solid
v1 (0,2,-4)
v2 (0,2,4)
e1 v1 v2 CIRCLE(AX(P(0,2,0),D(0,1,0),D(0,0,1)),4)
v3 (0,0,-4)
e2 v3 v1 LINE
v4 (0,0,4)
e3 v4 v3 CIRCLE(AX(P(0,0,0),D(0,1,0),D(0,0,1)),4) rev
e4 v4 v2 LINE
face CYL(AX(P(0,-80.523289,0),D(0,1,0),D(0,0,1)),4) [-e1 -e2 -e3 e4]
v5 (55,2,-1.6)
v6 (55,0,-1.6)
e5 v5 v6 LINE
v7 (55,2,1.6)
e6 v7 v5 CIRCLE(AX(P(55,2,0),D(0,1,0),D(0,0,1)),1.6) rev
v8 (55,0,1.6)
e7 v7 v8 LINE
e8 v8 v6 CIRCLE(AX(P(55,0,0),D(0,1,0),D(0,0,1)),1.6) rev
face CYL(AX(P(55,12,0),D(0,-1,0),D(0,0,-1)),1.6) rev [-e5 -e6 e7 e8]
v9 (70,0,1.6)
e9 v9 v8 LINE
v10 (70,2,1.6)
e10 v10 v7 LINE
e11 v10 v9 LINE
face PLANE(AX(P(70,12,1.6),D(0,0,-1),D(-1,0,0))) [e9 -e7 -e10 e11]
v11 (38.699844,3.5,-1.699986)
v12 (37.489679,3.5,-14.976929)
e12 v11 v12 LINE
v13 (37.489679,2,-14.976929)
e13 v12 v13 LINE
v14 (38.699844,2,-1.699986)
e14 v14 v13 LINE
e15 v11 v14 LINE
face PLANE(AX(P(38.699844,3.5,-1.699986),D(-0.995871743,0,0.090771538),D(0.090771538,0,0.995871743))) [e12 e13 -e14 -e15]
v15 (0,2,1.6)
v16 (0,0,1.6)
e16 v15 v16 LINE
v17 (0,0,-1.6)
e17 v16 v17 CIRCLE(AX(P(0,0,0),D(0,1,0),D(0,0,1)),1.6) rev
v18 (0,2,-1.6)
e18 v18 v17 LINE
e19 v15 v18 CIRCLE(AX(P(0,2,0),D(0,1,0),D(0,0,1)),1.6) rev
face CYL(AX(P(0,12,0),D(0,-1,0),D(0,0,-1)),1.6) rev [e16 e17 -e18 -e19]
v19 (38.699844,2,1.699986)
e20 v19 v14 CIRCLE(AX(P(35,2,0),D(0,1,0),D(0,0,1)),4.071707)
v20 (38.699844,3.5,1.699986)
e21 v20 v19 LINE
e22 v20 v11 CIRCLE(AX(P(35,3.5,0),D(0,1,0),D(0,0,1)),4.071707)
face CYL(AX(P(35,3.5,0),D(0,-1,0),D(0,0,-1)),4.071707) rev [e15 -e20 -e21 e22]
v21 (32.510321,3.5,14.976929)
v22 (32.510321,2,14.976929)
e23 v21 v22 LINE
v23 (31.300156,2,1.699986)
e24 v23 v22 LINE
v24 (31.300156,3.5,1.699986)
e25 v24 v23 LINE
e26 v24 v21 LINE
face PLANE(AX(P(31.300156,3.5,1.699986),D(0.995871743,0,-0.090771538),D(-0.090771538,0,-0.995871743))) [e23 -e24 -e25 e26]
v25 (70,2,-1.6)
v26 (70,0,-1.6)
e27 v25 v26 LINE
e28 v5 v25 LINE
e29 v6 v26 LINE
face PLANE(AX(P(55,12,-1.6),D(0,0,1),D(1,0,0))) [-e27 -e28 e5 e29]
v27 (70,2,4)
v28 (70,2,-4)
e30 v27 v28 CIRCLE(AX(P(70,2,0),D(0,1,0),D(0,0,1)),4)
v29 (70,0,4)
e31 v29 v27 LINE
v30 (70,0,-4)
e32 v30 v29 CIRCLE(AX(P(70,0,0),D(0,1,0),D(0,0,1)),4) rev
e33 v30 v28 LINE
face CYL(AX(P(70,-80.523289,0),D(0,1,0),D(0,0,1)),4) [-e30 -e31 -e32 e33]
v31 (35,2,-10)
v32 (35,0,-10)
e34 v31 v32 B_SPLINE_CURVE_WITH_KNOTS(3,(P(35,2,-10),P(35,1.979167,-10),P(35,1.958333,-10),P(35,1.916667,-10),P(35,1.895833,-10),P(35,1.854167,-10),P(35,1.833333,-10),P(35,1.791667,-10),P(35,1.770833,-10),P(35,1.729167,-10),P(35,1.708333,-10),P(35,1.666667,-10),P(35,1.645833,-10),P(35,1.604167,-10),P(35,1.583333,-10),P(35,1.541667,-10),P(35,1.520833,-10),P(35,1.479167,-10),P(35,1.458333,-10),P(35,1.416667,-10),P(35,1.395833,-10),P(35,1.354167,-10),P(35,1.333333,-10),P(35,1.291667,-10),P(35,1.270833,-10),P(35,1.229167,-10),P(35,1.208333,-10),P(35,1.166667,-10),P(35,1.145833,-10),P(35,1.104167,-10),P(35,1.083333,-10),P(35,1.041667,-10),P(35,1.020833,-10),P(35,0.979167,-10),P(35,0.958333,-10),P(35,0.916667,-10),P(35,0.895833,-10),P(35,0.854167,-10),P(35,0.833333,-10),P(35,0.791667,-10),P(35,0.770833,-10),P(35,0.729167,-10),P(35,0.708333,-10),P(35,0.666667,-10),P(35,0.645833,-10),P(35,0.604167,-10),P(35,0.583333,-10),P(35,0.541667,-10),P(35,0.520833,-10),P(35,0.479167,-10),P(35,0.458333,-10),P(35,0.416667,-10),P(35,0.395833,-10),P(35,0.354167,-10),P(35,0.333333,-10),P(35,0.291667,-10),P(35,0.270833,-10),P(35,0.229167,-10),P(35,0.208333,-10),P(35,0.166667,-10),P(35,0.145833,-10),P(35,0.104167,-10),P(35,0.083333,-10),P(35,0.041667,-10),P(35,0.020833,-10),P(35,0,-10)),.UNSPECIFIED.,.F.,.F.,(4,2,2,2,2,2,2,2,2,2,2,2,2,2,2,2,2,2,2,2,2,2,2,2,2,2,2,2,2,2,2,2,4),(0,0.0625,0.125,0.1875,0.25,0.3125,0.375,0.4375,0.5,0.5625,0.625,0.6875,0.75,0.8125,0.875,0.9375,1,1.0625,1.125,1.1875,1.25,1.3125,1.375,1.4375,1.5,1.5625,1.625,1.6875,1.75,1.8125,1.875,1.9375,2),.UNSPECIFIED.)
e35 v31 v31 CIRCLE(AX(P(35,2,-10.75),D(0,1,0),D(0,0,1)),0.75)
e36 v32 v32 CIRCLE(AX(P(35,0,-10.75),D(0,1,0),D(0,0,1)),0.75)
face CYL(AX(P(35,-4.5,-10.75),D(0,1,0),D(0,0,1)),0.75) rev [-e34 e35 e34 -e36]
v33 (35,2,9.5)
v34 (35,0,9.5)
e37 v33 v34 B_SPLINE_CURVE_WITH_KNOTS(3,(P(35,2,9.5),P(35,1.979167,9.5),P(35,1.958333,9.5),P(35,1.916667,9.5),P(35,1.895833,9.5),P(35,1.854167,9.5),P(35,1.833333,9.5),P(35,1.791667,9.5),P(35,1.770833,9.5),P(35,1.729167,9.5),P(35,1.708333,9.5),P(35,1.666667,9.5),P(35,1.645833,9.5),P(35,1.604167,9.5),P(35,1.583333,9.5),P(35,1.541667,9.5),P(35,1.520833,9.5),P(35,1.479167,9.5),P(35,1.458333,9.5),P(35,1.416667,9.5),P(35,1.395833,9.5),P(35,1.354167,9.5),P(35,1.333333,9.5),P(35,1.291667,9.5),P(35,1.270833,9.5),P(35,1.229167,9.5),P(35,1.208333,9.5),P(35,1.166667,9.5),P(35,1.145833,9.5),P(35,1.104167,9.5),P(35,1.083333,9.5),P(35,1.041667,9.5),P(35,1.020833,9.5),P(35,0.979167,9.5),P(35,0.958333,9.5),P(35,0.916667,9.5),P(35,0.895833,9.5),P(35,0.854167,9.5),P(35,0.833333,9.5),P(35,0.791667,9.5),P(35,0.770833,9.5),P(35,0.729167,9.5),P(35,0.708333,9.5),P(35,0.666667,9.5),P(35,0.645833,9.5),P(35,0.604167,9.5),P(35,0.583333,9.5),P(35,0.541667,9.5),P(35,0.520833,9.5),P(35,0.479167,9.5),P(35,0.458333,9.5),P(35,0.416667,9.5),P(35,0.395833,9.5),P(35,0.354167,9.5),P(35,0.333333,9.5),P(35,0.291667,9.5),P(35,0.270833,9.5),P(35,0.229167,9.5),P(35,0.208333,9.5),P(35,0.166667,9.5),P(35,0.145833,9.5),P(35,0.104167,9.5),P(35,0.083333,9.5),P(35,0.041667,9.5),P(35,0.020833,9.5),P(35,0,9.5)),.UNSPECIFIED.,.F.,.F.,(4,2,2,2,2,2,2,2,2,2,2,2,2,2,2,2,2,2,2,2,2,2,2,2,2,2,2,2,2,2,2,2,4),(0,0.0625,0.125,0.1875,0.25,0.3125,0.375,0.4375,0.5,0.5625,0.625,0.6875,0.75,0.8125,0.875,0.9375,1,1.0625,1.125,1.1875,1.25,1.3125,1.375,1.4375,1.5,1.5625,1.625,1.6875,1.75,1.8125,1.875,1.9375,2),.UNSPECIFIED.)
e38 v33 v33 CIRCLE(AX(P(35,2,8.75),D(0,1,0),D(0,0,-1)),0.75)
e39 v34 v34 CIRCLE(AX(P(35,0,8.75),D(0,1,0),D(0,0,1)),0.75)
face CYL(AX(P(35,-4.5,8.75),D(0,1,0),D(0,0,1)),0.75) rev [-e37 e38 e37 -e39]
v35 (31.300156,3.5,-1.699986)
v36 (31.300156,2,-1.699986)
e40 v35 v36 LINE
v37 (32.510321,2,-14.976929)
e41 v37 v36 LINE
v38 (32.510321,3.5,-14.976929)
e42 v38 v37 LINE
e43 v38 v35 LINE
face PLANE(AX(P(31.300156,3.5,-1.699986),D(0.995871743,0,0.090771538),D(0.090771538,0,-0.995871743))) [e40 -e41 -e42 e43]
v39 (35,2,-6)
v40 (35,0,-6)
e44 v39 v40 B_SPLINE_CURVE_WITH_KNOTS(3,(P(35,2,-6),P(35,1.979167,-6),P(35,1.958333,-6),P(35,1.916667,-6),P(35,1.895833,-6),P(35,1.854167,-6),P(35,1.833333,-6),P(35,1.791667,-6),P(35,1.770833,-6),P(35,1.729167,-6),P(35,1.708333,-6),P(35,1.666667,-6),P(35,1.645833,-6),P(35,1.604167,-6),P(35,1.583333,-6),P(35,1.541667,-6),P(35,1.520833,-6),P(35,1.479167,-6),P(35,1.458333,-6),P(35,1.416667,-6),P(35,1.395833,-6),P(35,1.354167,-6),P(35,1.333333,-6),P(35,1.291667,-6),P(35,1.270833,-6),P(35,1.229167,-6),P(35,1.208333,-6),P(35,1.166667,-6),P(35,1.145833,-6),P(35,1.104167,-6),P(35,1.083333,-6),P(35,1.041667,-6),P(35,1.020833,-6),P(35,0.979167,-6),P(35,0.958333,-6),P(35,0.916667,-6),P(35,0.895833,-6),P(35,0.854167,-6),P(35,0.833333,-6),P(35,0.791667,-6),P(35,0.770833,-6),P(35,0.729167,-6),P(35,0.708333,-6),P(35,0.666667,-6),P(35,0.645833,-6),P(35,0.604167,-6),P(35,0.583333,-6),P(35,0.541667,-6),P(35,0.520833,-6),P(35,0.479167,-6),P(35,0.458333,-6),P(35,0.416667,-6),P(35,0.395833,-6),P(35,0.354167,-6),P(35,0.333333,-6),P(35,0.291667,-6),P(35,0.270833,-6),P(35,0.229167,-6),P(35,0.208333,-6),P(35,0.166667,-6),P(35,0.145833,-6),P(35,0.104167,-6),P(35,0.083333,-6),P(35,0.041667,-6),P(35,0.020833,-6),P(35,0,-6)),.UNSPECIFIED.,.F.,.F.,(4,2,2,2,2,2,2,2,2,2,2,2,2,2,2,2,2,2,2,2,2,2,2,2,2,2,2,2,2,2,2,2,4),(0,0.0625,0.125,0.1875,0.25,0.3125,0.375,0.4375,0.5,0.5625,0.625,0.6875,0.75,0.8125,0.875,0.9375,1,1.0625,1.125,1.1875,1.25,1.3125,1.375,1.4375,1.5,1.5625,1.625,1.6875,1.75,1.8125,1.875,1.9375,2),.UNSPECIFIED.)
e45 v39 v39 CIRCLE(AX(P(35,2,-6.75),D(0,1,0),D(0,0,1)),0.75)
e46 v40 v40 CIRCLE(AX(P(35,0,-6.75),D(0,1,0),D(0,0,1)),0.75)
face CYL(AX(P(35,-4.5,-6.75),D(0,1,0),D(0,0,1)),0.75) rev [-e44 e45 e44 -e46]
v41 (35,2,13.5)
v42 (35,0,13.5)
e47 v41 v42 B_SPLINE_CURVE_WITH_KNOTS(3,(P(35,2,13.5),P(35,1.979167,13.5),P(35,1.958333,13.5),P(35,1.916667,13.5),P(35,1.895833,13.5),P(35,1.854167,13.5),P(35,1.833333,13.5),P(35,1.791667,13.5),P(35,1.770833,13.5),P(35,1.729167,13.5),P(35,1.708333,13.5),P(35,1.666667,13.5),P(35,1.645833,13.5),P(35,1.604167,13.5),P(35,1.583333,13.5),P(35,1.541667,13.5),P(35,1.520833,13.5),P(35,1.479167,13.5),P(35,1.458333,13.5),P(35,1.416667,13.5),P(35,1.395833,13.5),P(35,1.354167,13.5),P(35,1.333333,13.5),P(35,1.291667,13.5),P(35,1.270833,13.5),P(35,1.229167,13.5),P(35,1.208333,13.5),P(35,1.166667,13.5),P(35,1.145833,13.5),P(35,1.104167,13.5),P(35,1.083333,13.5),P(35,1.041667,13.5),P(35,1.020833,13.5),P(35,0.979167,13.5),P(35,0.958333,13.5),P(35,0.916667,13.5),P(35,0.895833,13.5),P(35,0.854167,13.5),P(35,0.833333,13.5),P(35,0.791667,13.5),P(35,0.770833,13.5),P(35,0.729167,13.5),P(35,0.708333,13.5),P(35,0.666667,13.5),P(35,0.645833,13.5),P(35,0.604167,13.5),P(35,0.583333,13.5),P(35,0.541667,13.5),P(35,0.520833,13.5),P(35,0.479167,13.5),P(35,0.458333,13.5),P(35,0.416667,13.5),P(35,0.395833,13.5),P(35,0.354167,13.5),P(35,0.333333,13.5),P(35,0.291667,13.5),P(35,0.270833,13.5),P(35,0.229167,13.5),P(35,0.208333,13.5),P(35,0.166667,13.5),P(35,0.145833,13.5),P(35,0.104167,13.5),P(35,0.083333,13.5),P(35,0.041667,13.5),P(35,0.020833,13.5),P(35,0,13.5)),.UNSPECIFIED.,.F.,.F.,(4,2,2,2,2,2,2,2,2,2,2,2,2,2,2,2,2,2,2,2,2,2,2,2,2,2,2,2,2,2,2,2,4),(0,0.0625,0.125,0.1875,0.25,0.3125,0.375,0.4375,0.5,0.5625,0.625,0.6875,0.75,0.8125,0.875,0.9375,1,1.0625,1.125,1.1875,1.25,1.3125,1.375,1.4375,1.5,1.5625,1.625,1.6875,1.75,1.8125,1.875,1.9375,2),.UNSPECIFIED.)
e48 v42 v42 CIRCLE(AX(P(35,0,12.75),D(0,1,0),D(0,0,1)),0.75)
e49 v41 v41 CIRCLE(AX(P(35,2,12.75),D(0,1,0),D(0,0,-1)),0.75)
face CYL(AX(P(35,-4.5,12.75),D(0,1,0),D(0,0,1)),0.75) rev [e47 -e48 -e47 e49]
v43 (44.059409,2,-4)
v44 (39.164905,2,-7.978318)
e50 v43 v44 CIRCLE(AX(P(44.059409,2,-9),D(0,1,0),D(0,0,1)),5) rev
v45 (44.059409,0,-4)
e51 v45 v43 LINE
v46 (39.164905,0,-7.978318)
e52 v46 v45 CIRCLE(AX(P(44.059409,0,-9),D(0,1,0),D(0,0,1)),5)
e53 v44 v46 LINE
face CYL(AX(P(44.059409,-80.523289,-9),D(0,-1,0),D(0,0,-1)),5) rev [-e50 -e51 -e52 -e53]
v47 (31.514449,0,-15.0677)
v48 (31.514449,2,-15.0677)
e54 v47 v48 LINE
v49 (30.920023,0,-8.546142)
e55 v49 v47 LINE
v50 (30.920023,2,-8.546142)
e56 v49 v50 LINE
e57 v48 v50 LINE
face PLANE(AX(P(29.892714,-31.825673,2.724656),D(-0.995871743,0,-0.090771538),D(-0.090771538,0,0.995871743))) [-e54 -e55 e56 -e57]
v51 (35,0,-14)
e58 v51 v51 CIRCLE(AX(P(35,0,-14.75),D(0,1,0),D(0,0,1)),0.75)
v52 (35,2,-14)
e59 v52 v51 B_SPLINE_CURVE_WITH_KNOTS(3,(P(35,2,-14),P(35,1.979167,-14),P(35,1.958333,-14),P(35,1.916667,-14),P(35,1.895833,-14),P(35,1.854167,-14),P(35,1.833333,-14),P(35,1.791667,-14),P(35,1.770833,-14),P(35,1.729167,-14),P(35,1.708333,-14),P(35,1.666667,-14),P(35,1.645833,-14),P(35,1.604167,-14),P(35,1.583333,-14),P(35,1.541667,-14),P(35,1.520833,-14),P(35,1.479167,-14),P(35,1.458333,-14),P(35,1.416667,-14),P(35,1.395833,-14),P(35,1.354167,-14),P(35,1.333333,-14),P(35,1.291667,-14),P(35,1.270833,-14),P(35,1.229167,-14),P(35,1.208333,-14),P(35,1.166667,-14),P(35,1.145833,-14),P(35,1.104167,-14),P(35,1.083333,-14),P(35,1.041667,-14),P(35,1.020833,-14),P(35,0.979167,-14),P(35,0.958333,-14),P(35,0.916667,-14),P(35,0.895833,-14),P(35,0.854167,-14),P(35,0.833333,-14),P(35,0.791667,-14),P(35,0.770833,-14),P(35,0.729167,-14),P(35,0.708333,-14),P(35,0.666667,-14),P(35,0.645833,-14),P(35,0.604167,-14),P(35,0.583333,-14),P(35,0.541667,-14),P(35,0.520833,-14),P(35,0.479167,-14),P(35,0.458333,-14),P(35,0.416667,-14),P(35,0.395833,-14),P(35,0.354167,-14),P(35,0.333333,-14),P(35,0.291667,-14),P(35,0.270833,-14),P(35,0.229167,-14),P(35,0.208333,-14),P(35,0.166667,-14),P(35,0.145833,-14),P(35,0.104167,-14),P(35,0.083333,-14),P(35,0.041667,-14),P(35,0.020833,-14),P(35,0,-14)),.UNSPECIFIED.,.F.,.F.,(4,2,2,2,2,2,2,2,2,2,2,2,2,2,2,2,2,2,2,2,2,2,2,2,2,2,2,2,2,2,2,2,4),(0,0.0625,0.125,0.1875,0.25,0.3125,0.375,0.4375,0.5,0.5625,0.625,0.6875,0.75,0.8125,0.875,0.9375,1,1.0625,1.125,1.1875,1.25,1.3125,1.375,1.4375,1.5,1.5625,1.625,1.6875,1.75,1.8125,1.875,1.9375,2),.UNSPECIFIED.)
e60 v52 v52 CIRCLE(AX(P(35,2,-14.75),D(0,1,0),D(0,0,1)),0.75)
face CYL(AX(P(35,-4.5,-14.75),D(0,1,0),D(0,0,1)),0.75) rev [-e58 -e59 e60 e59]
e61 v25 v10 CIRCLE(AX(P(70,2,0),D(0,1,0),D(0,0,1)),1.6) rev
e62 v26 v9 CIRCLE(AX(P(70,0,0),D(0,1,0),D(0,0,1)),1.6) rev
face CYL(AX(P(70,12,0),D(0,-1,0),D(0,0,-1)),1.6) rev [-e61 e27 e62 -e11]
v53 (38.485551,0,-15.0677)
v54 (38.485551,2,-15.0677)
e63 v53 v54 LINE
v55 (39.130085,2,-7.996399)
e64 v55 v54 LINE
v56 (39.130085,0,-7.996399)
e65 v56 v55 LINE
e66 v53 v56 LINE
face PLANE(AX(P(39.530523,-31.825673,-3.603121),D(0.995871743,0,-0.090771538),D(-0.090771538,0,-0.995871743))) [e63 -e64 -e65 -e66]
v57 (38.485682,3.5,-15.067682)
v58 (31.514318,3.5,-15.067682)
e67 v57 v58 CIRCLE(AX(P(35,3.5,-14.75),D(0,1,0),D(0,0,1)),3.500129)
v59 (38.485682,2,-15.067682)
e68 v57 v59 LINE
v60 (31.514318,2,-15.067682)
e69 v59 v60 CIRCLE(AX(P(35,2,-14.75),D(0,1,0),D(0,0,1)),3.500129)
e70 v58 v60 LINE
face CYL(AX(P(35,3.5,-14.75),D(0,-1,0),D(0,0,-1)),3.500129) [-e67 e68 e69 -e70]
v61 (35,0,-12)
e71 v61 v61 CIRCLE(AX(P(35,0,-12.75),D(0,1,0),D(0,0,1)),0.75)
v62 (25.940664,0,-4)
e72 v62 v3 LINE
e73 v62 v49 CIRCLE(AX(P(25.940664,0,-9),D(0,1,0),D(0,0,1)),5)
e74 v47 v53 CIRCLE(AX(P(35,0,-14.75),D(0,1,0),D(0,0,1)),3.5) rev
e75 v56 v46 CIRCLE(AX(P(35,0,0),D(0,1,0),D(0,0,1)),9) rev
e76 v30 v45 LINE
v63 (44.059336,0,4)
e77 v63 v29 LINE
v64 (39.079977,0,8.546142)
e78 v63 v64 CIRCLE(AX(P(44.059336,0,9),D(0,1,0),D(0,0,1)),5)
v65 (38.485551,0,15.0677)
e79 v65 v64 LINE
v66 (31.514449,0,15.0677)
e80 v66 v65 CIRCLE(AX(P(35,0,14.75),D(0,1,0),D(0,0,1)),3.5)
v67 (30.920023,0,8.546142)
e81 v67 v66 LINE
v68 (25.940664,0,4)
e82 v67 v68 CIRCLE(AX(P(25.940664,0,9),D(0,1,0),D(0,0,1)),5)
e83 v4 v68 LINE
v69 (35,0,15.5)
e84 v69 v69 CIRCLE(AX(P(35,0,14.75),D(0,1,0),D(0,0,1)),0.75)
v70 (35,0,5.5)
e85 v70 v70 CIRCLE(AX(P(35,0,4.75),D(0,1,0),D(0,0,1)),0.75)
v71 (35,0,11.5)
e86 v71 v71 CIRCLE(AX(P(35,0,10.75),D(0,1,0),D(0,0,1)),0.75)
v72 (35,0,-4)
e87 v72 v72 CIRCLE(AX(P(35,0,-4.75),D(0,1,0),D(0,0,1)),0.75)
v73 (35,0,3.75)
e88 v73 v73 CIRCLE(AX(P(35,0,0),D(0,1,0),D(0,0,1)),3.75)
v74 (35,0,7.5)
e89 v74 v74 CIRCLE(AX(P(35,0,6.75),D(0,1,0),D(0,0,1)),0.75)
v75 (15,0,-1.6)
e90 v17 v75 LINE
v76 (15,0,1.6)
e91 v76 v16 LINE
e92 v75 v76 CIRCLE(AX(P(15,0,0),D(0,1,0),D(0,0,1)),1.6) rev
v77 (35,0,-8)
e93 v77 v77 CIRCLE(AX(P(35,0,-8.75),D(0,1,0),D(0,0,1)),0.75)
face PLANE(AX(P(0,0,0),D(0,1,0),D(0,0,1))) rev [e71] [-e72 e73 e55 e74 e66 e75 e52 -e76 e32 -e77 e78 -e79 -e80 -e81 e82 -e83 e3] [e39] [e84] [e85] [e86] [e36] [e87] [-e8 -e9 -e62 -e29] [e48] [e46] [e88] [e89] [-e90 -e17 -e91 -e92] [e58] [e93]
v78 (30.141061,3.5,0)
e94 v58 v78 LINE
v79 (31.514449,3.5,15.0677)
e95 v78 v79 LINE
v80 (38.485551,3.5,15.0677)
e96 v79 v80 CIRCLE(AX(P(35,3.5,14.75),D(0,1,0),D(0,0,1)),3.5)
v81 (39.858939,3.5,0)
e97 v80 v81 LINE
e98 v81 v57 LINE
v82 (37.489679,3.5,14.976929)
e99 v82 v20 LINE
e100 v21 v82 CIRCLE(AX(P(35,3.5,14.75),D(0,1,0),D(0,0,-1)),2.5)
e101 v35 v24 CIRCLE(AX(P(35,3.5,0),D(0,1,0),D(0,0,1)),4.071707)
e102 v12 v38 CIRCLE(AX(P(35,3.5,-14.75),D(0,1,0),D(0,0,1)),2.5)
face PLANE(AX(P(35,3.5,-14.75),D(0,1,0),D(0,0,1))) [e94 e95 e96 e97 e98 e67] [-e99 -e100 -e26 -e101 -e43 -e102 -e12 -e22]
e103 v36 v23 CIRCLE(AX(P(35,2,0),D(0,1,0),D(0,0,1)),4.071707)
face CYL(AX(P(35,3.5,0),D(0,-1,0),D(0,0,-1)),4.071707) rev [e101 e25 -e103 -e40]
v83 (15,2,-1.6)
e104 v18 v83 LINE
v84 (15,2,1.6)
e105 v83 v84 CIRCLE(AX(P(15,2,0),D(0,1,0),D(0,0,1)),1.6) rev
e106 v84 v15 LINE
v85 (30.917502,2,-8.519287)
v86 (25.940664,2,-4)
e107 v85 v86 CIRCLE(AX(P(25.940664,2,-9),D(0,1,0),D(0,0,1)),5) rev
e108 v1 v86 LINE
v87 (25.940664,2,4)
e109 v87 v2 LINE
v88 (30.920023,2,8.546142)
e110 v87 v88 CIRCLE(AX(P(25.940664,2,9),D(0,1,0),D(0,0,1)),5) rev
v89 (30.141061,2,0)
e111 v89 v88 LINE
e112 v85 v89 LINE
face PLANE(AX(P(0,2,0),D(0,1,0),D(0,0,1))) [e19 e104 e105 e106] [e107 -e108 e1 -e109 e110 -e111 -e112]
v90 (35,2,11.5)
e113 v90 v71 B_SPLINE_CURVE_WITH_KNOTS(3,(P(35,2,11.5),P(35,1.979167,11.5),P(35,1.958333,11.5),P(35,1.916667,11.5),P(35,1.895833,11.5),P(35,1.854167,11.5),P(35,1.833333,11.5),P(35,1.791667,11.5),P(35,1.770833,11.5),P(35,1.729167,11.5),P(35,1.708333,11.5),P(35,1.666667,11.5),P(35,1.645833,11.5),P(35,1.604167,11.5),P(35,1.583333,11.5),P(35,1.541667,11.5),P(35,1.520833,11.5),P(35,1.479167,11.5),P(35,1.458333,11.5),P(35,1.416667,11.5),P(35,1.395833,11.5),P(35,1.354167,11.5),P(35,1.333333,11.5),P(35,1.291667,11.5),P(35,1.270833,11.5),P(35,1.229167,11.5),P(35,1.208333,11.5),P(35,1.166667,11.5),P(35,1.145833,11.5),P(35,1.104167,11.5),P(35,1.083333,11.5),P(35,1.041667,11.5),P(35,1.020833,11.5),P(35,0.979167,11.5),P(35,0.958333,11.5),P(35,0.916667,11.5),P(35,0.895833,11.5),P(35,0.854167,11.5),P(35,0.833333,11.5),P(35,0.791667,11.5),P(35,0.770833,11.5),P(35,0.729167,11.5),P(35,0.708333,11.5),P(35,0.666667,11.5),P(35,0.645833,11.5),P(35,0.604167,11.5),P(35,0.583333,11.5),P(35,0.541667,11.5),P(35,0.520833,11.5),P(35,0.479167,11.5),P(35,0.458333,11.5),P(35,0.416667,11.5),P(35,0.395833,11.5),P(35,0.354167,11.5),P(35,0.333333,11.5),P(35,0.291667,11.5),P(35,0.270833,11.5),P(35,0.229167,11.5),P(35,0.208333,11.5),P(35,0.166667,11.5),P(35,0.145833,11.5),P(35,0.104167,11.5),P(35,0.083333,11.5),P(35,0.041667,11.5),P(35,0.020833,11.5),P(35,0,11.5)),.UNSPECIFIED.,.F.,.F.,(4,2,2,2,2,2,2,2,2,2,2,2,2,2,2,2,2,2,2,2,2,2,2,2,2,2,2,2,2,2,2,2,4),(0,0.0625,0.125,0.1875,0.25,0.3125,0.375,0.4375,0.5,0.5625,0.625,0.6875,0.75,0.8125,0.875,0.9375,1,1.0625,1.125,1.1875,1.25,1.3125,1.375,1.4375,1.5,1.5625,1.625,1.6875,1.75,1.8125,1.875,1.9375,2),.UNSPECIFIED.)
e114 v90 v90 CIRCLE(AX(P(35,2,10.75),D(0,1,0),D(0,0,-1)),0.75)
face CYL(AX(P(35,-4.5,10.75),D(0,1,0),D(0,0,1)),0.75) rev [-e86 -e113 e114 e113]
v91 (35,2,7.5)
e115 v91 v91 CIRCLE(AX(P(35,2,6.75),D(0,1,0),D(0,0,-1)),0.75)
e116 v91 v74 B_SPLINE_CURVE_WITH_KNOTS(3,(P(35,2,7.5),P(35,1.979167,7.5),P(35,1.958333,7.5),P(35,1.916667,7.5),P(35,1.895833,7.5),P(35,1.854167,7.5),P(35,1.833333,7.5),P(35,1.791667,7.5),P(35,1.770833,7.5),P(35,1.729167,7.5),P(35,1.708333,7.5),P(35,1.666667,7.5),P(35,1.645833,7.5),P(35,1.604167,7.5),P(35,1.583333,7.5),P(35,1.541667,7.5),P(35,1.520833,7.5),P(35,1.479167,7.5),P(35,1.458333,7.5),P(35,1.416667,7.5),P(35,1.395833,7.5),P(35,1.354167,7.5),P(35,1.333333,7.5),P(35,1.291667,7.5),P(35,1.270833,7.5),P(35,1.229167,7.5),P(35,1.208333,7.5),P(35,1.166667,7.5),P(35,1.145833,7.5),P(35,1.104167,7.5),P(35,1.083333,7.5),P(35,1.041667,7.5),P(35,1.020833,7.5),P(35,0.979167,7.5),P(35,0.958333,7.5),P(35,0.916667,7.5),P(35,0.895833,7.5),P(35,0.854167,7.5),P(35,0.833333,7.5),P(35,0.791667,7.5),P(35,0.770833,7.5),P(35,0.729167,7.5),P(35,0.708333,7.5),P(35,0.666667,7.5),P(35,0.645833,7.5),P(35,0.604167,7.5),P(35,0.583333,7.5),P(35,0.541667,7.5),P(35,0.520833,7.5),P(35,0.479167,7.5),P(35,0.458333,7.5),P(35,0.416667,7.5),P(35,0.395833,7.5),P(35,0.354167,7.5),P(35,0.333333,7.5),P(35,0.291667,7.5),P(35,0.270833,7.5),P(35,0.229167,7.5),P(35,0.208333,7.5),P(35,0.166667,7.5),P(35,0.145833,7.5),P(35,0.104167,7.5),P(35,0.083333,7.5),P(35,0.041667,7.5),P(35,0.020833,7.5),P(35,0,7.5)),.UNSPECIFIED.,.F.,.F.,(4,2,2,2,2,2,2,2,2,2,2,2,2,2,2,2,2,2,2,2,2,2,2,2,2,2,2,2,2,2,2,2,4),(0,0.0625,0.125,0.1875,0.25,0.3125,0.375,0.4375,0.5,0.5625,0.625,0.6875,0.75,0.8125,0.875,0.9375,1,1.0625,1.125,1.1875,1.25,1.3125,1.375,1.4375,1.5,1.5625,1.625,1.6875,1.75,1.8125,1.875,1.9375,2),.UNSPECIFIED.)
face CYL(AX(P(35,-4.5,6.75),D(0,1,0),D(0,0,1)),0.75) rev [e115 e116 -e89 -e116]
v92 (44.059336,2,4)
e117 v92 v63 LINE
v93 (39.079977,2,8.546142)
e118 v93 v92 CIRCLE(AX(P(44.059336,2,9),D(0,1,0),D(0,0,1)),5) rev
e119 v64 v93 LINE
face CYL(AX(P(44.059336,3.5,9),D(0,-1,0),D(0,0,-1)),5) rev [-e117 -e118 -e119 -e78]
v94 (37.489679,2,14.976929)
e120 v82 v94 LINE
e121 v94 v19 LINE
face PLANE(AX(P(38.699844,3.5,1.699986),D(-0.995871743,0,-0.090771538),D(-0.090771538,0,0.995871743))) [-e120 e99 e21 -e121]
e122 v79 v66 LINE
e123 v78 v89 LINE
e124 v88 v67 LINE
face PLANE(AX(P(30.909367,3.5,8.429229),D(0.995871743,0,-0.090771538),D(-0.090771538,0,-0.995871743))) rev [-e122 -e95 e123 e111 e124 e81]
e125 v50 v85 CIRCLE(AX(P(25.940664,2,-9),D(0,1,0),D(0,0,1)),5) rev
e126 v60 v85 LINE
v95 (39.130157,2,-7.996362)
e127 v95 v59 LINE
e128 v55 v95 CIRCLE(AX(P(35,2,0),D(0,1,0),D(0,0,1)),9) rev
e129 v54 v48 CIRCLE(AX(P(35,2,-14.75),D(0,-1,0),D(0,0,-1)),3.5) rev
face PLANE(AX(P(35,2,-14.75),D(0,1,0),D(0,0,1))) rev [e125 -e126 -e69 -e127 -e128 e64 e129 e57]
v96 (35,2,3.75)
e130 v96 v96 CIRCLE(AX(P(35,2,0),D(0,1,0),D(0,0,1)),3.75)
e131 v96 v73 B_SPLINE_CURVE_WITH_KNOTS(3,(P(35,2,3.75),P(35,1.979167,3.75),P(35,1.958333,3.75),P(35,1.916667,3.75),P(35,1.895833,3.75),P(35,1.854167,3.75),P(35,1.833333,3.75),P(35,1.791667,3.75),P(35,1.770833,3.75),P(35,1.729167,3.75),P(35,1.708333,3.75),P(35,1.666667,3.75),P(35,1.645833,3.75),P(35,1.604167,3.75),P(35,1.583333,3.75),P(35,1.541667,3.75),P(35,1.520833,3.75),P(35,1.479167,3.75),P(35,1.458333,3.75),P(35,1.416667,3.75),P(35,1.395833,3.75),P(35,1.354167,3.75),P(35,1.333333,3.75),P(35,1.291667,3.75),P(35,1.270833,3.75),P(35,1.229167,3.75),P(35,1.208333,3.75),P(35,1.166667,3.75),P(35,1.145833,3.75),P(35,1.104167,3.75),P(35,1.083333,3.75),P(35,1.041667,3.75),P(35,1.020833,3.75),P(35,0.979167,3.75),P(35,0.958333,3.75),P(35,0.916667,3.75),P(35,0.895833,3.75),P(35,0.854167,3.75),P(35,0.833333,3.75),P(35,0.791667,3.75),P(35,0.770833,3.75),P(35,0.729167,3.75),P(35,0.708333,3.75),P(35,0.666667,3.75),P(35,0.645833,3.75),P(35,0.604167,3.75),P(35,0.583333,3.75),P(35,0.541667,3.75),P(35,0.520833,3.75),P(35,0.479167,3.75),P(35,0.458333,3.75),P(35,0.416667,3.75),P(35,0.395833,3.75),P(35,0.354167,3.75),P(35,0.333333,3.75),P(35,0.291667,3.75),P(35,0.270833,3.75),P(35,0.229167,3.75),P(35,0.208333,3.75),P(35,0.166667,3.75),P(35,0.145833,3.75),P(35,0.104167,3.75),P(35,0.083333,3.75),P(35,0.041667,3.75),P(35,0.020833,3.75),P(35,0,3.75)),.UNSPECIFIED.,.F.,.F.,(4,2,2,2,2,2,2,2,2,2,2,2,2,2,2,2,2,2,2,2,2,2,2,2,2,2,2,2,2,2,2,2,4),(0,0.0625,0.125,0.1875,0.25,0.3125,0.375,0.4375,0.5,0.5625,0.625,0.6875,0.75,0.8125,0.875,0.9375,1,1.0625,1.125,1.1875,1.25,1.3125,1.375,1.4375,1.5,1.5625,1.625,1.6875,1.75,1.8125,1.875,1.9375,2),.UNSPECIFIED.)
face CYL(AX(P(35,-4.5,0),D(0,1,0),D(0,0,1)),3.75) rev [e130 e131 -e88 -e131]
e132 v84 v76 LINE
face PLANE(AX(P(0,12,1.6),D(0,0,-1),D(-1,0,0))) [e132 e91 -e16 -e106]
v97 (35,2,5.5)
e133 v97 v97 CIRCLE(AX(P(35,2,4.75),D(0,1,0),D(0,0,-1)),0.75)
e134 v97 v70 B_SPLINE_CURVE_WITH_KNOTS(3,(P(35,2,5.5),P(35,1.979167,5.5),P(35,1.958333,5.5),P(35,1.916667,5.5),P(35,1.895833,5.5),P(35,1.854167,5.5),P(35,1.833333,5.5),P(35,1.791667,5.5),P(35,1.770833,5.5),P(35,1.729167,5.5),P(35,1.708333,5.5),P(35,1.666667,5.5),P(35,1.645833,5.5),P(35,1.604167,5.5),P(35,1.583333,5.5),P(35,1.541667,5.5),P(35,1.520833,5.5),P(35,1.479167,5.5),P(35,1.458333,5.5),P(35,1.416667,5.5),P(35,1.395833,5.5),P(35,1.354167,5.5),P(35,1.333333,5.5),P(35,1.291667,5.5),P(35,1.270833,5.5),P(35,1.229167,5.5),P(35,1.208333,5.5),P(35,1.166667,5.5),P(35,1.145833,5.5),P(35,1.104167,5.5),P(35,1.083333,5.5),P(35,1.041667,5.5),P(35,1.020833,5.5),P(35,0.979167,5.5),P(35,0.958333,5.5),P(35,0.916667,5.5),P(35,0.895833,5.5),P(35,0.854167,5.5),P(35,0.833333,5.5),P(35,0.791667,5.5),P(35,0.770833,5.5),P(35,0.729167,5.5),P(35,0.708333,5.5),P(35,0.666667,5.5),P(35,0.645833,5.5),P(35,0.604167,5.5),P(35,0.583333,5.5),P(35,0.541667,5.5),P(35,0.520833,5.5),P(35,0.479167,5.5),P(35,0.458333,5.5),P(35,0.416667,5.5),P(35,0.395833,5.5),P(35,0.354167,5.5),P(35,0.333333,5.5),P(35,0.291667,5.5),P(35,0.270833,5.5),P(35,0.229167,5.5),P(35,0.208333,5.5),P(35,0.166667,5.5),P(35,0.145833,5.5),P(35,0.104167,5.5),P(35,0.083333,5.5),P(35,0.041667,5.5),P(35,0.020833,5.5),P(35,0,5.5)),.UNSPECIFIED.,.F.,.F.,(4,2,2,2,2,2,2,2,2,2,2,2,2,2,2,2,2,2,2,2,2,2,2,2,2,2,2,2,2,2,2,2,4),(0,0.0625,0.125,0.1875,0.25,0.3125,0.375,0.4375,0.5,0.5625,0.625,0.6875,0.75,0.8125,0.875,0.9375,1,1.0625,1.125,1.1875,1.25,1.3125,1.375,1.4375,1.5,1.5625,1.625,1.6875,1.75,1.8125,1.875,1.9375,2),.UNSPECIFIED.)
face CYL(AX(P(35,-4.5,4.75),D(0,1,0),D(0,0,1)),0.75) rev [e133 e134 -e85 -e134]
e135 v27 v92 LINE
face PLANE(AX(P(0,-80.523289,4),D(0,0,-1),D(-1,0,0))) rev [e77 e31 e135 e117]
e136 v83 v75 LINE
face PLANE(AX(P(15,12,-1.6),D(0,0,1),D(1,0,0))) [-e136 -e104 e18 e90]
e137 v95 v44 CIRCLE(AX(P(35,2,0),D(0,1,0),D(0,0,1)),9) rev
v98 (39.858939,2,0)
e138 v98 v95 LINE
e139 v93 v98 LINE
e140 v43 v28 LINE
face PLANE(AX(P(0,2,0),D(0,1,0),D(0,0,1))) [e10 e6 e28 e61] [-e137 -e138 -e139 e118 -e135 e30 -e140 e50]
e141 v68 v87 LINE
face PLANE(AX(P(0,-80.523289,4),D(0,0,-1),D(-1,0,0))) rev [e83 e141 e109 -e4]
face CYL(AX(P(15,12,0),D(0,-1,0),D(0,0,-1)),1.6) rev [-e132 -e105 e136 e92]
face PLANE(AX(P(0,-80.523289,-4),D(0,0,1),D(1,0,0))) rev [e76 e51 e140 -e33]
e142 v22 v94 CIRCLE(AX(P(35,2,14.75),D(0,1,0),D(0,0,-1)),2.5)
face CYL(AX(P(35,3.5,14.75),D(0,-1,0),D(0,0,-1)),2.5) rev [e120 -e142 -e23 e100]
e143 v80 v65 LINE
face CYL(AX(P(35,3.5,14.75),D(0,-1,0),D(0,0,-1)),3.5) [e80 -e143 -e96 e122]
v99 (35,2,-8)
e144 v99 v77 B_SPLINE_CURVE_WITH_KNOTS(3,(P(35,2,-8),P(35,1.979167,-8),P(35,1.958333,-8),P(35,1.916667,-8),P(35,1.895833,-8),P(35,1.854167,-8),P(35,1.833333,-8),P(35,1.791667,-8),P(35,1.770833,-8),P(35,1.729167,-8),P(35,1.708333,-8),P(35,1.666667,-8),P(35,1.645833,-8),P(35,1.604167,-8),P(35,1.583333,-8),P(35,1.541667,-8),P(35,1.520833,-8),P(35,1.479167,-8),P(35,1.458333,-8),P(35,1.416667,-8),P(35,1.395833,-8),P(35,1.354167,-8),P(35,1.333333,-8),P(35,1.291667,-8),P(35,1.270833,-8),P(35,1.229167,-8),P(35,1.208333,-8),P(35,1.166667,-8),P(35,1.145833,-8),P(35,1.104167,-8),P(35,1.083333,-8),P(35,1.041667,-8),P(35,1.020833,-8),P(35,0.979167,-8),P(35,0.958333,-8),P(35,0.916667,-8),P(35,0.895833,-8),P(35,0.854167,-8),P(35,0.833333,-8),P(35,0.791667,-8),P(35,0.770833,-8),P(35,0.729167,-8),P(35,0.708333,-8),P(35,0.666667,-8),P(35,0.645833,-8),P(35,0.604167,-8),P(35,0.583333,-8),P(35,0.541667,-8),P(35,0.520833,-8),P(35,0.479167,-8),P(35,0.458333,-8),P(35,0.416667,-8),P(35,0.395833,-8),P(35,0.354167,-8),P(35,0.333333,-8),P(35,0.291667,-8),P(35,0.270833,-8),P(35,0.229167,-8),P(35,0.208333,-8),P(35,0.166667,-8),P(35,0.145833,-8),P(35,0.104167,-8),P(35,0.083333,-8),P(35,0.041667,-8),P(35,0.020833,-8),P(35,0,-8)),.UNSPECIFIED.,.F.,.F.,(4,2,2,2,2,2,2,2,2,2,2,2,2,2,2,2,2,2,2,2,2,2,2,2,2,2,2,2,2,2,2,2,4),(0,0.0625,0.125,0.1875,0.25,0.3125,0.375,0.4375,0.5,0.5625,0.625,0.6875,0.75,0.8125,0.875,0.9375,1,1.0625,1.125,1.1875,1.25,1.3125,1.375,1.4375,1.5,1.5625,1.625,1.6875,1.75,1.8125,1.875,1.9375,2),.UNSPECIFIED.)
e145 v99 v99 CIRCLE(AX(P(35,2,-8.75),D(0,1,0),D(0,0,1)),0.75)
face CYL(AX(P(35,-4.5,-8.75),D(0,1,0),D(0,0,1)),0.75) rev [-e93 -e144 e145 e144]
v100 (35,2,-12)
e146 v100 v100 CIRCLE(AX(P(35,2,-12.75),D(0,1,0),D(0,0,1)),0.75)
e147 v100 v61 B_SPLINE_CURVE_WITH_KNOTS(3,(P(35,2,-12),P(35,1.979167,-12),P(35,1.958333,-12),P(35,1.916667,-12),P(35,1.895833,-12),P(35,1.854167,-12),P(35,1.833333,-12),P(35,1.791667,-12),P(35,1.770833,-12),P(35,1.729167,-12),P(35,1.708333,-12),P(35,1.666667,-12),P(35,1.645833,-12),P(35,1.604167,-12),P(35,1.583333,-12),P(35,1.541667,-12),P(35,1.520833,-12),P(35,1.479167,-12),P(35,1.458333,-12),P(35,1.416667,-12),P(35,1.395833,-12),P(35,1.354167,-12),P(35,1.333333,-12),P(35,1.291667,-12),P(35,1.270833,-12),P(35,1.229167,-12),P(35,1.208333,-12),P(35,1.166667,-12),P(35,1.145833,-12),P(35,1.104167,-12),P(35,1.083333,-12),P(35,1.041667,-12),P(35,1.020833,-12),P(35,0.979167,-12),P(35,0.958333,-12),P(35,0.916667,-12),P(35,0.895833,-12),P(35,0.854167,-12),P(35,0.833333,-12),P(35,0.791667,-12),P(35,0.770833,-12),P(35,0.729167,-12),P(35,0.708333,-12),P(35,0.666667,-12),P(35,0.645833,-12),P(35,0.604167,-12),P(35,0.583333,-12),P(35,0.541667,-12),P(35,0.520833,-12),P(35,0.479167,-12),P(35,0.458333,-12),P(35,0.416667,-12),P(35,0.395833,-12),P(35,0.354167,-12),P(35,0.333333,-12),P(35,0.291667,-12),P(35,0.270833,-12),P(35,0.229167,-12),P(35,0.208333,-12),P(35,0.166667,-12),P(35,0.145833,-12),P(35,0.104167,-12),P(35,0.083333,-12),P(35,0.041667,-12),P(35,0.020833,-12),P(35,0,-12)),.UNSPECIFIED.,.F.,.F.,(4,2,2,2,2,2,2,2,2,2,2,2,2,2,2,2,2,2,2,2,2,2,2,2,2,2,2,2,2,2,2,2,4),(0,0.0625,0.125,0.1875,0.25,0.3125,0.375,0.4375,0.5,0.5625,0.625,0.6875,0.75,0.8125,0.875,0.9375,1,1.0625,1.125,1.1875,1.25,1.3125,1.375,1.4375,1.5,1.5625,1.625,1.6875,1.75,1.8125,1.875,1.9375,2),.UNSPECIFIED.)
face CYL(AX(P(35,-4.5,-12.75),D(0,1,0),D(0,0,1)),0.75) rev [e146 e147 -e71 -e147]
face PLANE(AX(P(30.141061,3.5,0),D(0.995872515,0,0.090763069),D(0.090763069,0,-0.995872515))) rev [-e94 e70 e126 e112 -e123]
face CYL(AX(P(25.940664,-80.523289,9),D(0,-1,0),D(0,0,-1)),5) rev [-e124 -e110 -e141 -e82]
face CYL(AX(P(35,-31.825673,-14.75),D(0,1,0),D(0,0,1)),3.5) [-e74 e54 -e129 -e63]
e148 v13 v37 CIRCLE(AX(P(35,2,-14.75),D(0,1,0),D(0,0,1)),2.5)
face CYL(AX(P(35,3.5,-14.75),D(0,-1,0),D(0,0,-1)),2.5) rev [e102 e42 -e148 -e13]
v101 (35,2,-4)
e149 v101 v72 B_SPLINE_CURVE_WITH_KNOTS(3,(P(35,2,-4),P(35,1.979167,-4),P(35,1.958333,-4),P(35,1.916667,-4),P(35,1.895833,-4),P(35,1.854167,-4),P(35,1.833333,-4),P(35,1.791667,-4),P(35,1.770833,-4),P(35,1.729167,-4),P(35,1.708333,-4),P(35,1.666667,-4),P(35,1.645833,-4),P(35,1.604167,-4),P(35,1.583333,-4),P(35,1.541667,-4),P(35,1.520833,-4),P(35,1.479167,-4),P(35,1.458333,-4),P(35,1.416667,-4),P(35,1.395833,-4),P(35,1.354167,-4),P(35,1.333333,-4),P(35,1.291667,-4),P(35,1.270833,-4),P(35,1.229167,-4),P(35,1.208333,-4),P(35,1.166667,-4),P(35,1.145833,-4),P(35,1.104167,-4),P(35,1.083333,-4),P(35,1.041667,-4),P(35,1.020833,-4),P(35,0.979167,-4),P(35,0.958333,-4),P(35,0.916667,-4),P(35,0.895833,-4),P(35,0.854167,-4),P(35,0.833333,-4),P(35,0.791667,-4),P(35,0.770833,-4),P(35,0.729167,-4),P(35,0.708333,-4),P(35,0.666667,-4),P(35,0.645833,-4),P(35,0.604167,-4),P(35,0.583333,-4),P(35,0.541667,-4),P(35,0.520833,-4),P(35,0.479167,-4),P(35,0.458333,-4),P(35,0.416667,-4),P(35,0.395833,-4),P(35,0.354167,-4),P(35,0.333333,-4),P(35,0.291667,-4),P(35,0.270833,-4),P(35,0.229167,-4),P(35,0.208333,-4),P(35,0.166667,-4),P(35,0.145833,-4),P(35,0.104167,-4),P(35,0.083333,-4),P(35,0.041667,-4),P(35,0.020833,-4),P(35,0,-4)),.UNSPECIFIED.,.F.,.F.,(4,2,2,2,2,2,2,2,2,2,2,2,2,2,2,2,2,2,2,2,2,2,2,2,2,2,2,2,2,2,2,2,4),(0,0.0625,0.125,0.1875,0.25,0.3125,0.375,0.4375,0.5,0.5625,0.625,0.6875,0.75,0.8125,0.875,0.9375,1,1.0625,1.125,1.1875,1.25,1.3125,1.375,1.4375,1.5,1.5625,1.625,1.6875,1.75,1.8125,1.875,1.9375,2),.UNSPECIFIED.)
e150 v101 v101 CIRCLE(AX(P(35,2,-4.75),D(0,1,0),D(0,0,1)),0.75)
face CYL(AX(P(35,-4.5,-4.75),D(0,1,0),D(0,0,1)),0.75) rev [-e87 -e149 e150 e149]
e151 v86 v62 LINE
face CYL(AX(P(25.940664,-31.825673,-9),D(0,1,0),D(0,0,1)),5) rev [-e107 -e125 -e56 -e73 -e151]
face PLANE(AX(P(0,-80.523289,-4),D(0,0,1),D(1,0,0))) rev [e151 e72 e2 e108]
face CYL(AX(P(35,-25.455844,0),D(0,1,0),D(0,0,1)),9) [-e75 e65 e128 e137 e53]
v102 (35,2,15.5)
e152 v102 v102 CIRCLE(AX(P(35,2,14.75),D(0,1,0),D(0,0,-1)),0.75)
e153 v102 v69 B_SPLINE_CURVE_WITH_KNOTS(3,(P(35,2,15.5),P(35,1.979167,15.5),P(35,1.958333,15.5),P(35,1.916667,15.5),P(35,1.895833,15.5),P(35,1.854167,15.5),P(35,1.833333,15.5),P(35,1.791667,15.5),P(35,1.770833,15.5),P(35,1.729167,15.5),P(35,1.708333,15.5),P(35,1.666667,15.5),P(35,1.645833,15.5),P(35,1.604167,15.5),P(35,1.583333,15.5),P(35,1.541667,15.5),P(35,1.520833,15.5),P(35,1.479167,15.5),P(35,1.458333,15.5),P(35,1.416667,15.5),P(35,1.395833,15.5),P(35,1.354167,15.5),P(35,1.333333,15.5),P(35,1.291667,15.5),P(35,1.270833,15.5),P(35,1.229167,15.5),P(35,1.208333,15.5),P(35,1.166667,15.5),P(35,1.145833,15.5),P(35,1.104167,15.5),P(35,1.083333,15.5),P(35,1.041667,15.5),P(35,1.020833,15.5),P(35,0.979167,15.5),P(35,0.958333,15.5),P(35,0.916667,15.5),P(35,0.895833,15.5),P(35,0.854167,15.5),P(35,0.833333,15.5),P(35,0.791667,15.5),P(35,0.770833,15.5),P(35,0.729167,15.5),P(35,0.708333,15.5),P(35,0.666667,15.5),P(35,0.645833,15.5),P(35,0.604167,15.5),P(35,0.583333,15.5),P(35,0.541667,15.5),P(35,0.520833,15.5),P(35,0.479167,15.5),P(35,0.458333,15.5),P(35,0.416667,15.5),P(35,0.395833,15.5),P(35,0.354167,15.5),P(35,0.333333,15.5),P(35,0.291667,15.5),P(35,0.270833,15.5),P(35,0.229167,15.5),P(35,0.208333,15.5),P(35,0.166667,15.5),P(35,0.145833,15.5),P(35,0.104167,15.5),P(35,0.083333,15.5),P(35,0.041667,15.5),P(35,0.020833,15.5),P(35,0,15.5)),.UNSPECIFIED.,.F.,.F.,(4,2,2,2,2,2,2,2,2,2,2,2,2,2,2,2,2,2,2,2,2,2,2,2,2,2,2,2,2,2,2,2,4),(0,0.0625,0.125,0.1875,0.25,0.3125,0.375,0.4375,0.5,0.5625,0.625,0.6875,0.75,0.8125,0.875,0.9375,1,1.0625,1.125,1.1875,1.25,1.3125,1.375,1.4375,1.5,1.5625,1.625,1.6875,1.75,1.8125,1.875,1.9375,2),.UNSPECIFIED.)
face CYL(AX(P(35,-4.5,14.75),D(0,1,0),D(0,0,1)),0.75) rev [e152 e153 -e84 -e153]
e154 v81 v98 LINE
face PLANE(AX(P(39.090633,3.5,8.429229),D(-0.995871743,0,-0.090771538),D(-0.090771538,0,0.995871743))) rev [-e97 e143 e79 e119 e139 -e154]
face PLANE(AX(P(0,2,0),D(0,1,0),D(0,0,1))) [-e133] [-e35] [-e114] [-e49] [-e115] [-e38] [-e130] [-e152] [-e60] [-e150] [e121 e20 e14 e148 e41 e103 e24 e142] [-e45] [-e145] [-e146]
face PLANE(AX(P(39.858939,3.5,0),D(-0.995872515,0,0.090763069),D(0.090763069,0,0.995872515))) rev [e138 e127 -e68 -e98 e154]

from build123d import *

# Parameters (mm, degrees)
SKETCH1_R               = 1.6
BOSS_EXTRUDE1_DEPTH     = 2
SKETCH2_R               = 0.5
BOSS_EXTRUDE2_DEPTH     = 2
SKETCH3_R               = 1.6
BOSS_EXTRUDE3_DEPTH     = 4
SKETCH4_R               = 5.618069601
SKETCH4_R_2             = 1.5
SKETCH4_R_3             = 9.019483561
CUT_EXTRUDE1_DEPTH      = 20
CUT_EXTRUDE2_DEPTH      = 10
CUT_EXTRUDE2_DEPTH_BACK = 10
SKETCH6_W               = 4
SKETCH6_H               = 1
SKETCH6_R               = 0.5
BOSS_EXTRUDE5_DEPTH     = 2
SKETCH7_R               = 9
SKETCH7_R_2             = 5
BOSS_EXTRUDE6_DEPTH     = 2
SKETCH8_R               = 5
CUT_EXTRUDE3_DEPTH      = 10
SKETCH9_R               = 5
SKETCH9_R_2             = 3.75
BOSS_EXTRUDE7_DEPTH     = 2
BOSS_EXTRUDE9_DEPTH     = 1.5
BOSS_EXTRUDE10_DEPTH    = 2
SKETCH12_R              = 3.75
CUT_EXTRUDE5_DEPTH      = 6.5
SKETCH13_R              = 0.75
CUT_EXTRUDE6_DEPTH      = 6.5
CUT_EXTRUDE8_DEPTH      = 6.5
FILLET2_DEPTH           = 2


with BuildPart() as part:
    # Sketch1 → Boss-Extrude1 (new body)
    with BuildSketch(Plane(origin=(0, 0, 0), x_dir=(1, 0, 0), z_dir=(0, 1, 0))):
        with BuildLine():
            Line((0, 3), (70, 3))
            ThreePointArc((70, 3), (73, 0), (70, -3))
            Line((70, -3), (0, -3))
            ThreePointArc((0, -3), (-3, 0), (0, 3))
        make_face()
        with Locations(Location((0, 0, 0), (0, 0, 270))):
            Circle(SKETCH1_R, mode=Mode.SUBTRACT)
        with Locations(Location((70, 0, 0), (0, 0, 270))):
            Circle(SKETCH1_R, mode=Mode.SUBTRACT)
        with Locations(Location((35, 0, 0), (0, 0, 270))):
            Circle(SKETCH1_R, mode=Mode.SUBTRACT)
    extrude(amount=BOSS_EXTRUDE1_DEPTH)

    # Sketch2 → Boss-Extrude2 (add)
    # profile 1 of 2: a face of its own
    with BuildSketch(Plane(origin=(0, 2, 0), x_dir=(1, 0, 0), z_dir=(0, 1, 0))):
        with BuildLine():
            Line((37, -3), (33, -3))
            Line((33, -3), (33, -14))
            ThreePointArc((33, -14), (35, -16), (37, -14))
            Line((37, -14), (37, -3))
        make_face()
        with Locations(Location((35, -11.5, 0), (0, 0, 270))):
            Circle(SKETCH2_R, mode=Mode.SUBTRACT)
        with Locations(Location((35, -14, 0), (0, 0, 270))):
            Circle(SKETCH2_R, mode=Mode.SUBTRACT)
        with Locations(Location((35, -9.5, 0), (0, 0, 270))):
            Circle(SKETCH2_R, mode=Mode.SUBTRACT)
    # profile 2 of 2: a face of its own
    with BuildSketch(Plane(origin=(0, 2, 0), x_dir=(1, 0, 0), z_dir=(0, 1, 0))):
        with BuildLine():
            Line((33, 14), (33, 3))
            Line((33, 3), (37, 3))
            Line((37, 3), (37, 14))
            ThreePointArc((37, 14), (35, 16), (33, 14))
        make_face()
        with Locations(Location((35, 9.5, 0), (0, 0, 270))):
            Circle(SKETCH2_R, mode=Mode.SUBTRACT)
        with Locations(Location((35, 14, 0), (0, 0, 270))):
            Circle(SKETCH2_R, mode=Mode.SUBTRACT)
        with Locations(Location((35, 11.5, 0), (0, 0, 270))):
            Circle(SKETCH2_R, mode=Mode.SUBTRACT)
    extrude(amount=-BOSS_EXTRUDE2_DEPTH)

    # Sketch3 → Boss-Extrude3 (add)
    with BuildSketch(Plane(origin=(0, 0, 0), x_dir=(-1, 0, 0), z_dir=(0, -1, 0))):
        with Locations(Location((-70, 0, 0), (0, 0, 90))):
            Circle(SKETCH3_R)
        with Locations(Location((0, 0, 0), (0, 0, 90))):
            Circle(SKETCH3_R)
    extrude(amount=-BOSS_EXTRUDE3_DEPTH)

    # Sketch4 → Cut-Extrude1 (cut)
    # profile 1 of 2: a face of its own
    with BuildSketch(Plane(origin=(0, 2, 0), x_dir=(1, 0, 0), z_dir=(0, 1, 0))):
        with Locations((70, 0)):
            Circle(SKETCH4_R)
        with Locations(Location((70, 0, 0), (0, 0, 90))):
            Circle(SKETCH4_R_2, mode=Mode.SUBTRACT)
    # profile 2 of 2: a face of its own
    with BuildSketch(Plane(origin=(0, 2, 0), x_dir=(1, 0, 0), z_dir=(0, 1, 0))):
        Circle(SKETCH4_R_3)
        with Locations(Location((0, 0, 0), (0, 0, 90))):
            Circle(SKETCH4_R_2, mode=Mode.SUBTRACT)
    extrude(amount=CUT_EXTRUDE1_DEPTH, mode=Mode.SUBTRACT)

    # Sketch5 → Cut-Extrude2 (cut, two sides: drawn at the far end of the back side and taken through both)
    with BuildSketch(Plane(origin=(0, 2, 0), x_dir=(1, 0, 0), z_dir=(0, 1, 0)).offset(-CUT_EXTRUDE2_DEPTH_BACK)):
        with BuildLine():
            Line((55, 1.6), (70, 1.6))
            ThreePointArc((70, 1.6), (71.6, 0), (70, -1.6))
            Line((70, -1.6), (55, -1.6))
            ThreePointArc((55, -1.6), (53.4, 0), (55, 1.6))
        make_face()
        with BuildLine():
            Line((0, -1.6), (15, -1.6))
            ThreePointArc((15, -1.6), (16.6, 0), (15, 1.6))
            Line((15, 1.6), (0, 1.6))
            ThreePointArc((0, 1.6), (-1.6, 0), (0, -1.6))
        make_face()
    extrude(amount=CUT_EXTRUDE2_DEPTH + CUT_EXTRUDE2_DEPTH_BACK, mode=Mode.SUBTRACT)

    # Sketch6 → Boss-Extrude5 (add)
    # profile 1 of 5: a face of its own
    with BuildSketch(Plane(origin=(0, 2, 0), x_dir=(1, 0, 0), z_dir=(0, 1, 0))):
        with Locations((35, 3.5)):
            Rectangle(SKETCH6_W, SKETCH6_H)
    # profile 2 of 5: a face of its own
    with BuildSketch(Plane(origin=(0, 2, 0), x_dir=(1, 0, 0), z_dir=(0, 1, 0))):
        with BuildLine():
            Line((33, 4), (0, 4))
            ThreePointArc((0, 4), (-4, 0), (0, -4))
            Line((0, -4), (33, -4))
            Line((33, -4), (33, -3))
            Line((33, -3), (0, -3))
            ThreePointArc((0, -3), (-3, 0), (0, 3))
            Line((0, 3), (33, 3))
            Line((33, 3), (33, 4))
        make_face()
    # profile 3 of 5: a face of its own
    with BuildSketch(Plane(origin=(0, 2, 0), x_dir=(1, 0, 0), z_dir=(0, 1, 0))):
        with BuildLine():
            Line((70, 4), (37, 4))
            Line((37, 4), (37, 3))
            Line((37, 3), (70, 3))
            ThreePointArc((70, 3), (73, 0), (70, -3))
            Line((70, -3), (37, -3))
            Line((37, -3), (37, -4))
            Line((37, -4), (70, -4))
            ThreePointArc((70, -4), (74, 0), (70, 4))
        make_face()
    # profile 4 of 5: a face of its own
    with BuildSketch(Plane(origin=(0, 2, 0), x_dir=(1, 0, 0), z_dir=(0, 1, 0))):
        with Locations((35, -3.5)):
            Rectangle(SKETCH6_W, SKETCH6_H)
    # profile 5 of 5: a face of its own
    with BuildSketch(Plane(origin=(0, 2, 0), x_dir=(1, 0, 0), z_dir=(0, 1, 0))):
        with BuildLine():
            Line((33, 14), (33, 4))
            Line((33, 4), (37, 4))
            Line((37, 4), (37, 14))
            ThreePointArc((37, 14), (35, 16), (33, 14))
        make_face()
        with Locations(Location((35, 9.5, 0), (0, 0, 270))):
            Circle(SKETCH6_R, mode=Mode.SUBTRACT)
        with Locations(Location((35, 11.5, 0), (0, 0, 270))):
            Circle(SKETCH6_R, mode=Mode.SUBTRACT)
        with Locations(Location((35, 14, 0), (0, 0, 270))):
            Circle(SKETCH6_R, mode=Mode.SUBTRACT)
    extrude(amount=-BOSS_EXTRUDE5_DEPTH)

    # Sketch7 → Boss-Extrude6 (add)
    with BuildSketch(Plane(origin=(0, 2, 0), x_dir=(1, 0, 0), z_dir=(0, 1, 0))):
        with Locations((35, 0)):
            Circle(SKETCH7_R)
        with Locations((35, 0)):
            Circle(SKETCH7_R_2, mode=Mode.SUBTRACT)
    extrude(amount=-BOSS_EXTRUDE6_DEPTH)

    # Sketch8 → Cut-Extrude3 (cut)
    with BuildSketch(Plane(origin=(0, 2, 0), x_dir=(1, 0, 0), z_dir=(0, 1, 0))):
        with Locations(Location((35, 0, 0), (0, 0, 270))):
            Circle(SKETCH8_R)
    extrude(amount=-CUT_EXTRUDE3_DEPTH, mode=Mode.SUBTRACT)

    # Sketch9 → Boss-Extrude7 (add)
    with BuildSketch(Plane(origin=(0, 2, 0), x_dir=(1, 0, 0), z_dir=(0, 1, 0))):
        with Locations((35, 0)):
            Circle(SKETCH9_R)
        with Locations(Location((35, 0, 0), (0, 0, 270))):
            Circle(SKETCH9_R_2, mode=Mode.SUBTRACT)
    extrude(amount=-BOSS_EXTRUDE7_DEPTH)

    # Sketch10 → Boss-Extrude9 (add)
    with BuildSketch(Plane(origin=(0, 2, 0), x_dir=(1, 0, 0), z_dir=(0, 1, 0))):
        with BuildLine():
            Line((39.090633308, -8.429228841), (38.485551099, -15.067700384))
            ThreePointArc((38.485551099, -15.067700384), (35, -18.25), (31.514448901, -15.067700384))
            Line((31.514448901, -15.067700384), (30.909366692, -8.429228841))
            Line((30.909366692, -8.429228841), (30.141060861, 0))
            Line((30.141060861, 0), (31.514318053, 15.067682419))
            ThreePointArc((31.514318053, 15.067682419), (35, 18.250128677), (38.485681947, 15.067682419))
            Line((38.485681947, 15.067682419), (39.858939139, 0))
            Line((39.858939139, 0), (39.090633308, -8.429228841))
        make_face()
        with BuildLine():
            Line((38.699843773, 1.69998576), (37.489679357, 14.976928845))
            ThreePointArc((37.489679357, 14.976928845), (35, 17.25), (32.510320643, 14.976928845))
            Line((32.510320643, 14.976928845), (31.300156227, 1.69998576))
            ThreePointArc((31.300156227, 1.69998576), (30.92829329, 0), (31.300156227, -1.69998576))
            Line((31.300156227, -1.69998576), (32.510320643, -14.976928845))
            ThreePointArc((32.510320643, -14.976928845), (35, -17.25), (37.489679357, -14.976928845))
            Line((37.489679357, -14.976928845), (38.699843773, -1.69998576))
            ThreePointArc((38.699843773, -1.69998576), (39.07170671, 0), (38.699843773, 1.69998576))
        make_face(mode=Mode.SUBTRACT)
    extrude(amount=BOSS_EXTRUDE9_DEPTH)

    # Sketch11 → Boss-Extrude10 (add)
    with BuildSketch(Plane(origin=(0, 2, 0), x_dir=(-1, 0, 0), z_dir=(0, -1, 0))):
        with BuildLine():
            Line((-37.489679357, -14.976928845), (-38.084133031, -8.455064958))
            ThreePointArc((-38.084133031, -8.455064958), (-38.614391825, -8.242340186), (-39.130084789, -7.996399167))
            Line((-39.130084789, -7.996399167), (-38.485551099, -15.067700384))
            ThreePointArc((-38.485551099, -15.067700384), (-35, -18.25), (-31.514448901, -15.067700384))
            Line((-31.514448901, -15.067700384), (-30.869915211, -7.996399167))
            ThreePointArc((-30.869915211, -7.996399167), (-31.385608175, -8.242340186), (-31.915866969, -8.455064958))
            Line((-31.915866969, -8.455064958), (-32.510320643, -14.976928845))
            ThreePointArc((-32.510320643, -14.976928845), (-35, -17.25), (-37.489679357, -14.976928845))
        make_face()
        with BuildLine():
            Line((-30.869915211, -7.996399167), (-39.130084789, -7.996399167))
            ThreePointArc((-39.130084789, -7.996399167), (-38.614391825, -8.242340186), (-38.084133031, -8.455064958))
            Line((-38.084133031, -8.455064958), (-37.489679357, -14.976928845))
            ThreePointArc((-37.489679357, -14.976928845), (-35, -17.25), (-32.510320643, -14.976928845))
            Line((-32.510320643, -14.976928845), (-31.915866969, -8.455064958))
            ThreePointArc((-31.915866969, -8.455064958), (-31.385608175, -8.242340186), (-30.869915211, -7.996399167))
        make_face()
        with BuildLine():
            ThreePointArc((-39.130084789, 7.996399167), (-35, 9), (-30.869915211, 7.996399167))
            Line((-30.869915211, 7.996399167), (-31.514448901, 15.067700384))
            ThreePointArc((-31.514448901, 15.067700384), (-35, 18.25), (-38.485551099, 15.067700384))
            Line((-38.485551099, 15.067700384), (-39.130084789, 7.996399167))
        make_face()
        with BuildLine():
            Line((-39.130084789, -7.996399167), (-30.869915211, -7.996399167))
            ThreePointArc((-30.869915211, -7.996399167), (-26, 0), (-30.869915211, 7.996399167))
            Line((-30.869915211, 7.996399167), (-39.130084789, 7.996399167))
            ThreePointArc((-39.130084789, 7.996399167), (-44, 0), (-39.130084789, -7.996399167))
        make_face()
    extrude(amount=BOSS_EXTRUDE10_DEPTH)

    # Sketch12 → Cut-Extrude5 (cut)
    with BuildSketch(Plane(origin=(0, 2, 0), x_dir=(1, 0, 0), z_dir=(0, 1, 0))):
        with Locations(Location((35, 0, 0), (0, 0, 270))):
            Circle(SKETCH12_R)
    extrude(amount=-CUT_EXTRUDE5_DEPTH, mode=Mode.SUBTRACT)

    # Sketch13 → Cut-Extrude6 (cut)
    with BuildSketch(Plane(origin=(0, 2, 0), x_dir=(1, 0, 0), z_dir=(0, 1, 0))):
        with Locations(Location((35, 14.75, 0), (0, 0, 270))):
            Circle(SKETCH13_R)
        with Locations(Location((35, 12.75, 0), (0, 0, 270))):
            Circle(SKETCH13_R)
        with Locations(Location((35, 10.75, 0), (0, 0, 270))):
            Circle(SKETCH13_R)
        with Locations(Location((35, 8.75, 0), (0, 0, 270))):
            Circle(SKETCH13_R)
        with Locations(Location((35, 6.75, 0), (0, 0, 270))):
            Circle(SKETCH13_R)
        with Locations(Location((35, 4.75, 0), (0, 0, 270))):
            Circle(SKETCH13_R)
        with Locations(Location((35, -4.75, 0), (0, 0, 270))):
            Circle(SKETCH13_R)
        with Locations(Location((35, -6.75, 0), (0, 0, 270))):
            Circle(SKETCH13_R)
        with Locations(Location((35, -8.75, 0), (0, 0, 270))):
            Circle(SKETCH13_R)
        with Locations(Location((35, -10.75, 0), (0, 0, 270))):
            Circle(SKETCH13_R)
        with Locations(Location((35, -12.75, 0), (0, 0, 270))):
            Circle(SKETCH13_R)
        with Locations(Location((35, -14.75, 0), (0, 0, 270))):
            Circle(SKETCH13_R)
    extrude(amount=-CUT_EXTRUDE6_DEPTH, mode=Mode.SUBTRACT)

    # Sketch14 → Cut-Extrude8 (cut)
    with BuildSketch(Plane(origin=(0, 2, 0), x_dir=(1, 0, 0), z_dir=(0, 1, 0))):
        Polygon((43.062257748, 4), (39.494547944, 3.998181), (39.130156748, 7.996362), (43.062257748, 8.354730715), align=None)
        Polygon((26.937742252, 4), (30.505452056, 3.998181), (30.869915211, 7.996399167), (26.937742252, 8.354841879), align=None)
        Polygon((26.937742252, -4), (30.505488036, -3.998199584), (30.869915211, -7.996399167), (26.937742252, -8.35480816), align=None)
        Polygon((43.062257748, -4), (39.494511964, -3.998199584), (39.130084789, -7.996399167), (43.062257748, -8.35480816), align=None)
    extrude(amount=-CUT_EXTRUDE8_DEPTH, mode=Mode.SUBTRACT)

    # Fillet2: read off the stored shape, not the designer's step
    # Fillet2 outline → Fillet2 (add)
    with BuildSketch(Plane(origin=(0, 0, 0), x_dir=(1, 0, 0), z_dir=(0, 1, 0))):
        with BuildLine():
            ThreePointArc((44.059408899, 4), (40.905713278, 5.120025267), (39.164905169, 7.978318428))
            ThreePointArc((39.164905169, 7.978318428), (39.147504832, 7.987377772), (39.130084789, 7.996399167))
            Line((39.130084789, 7.996399167), (39.494547943, 3.998181))
            Line((39.494547943, 3.998181), (43.062257748, 4))
            Line((43.062257748, 4), (44.059408899, 4))
        make_face()
        with BuildLine():
            Line((43.062257748, -4), (39.494511964, -3.998199584))
            Line((39.494511964, -3.998199584), (39.0799769, -8.546142309))
            ThreePointArc((39.0799769, -8.546142309), (40.688081281, -5.307488087), (44.059335613, -4))
            Line((44.059335613, -4), (43.062257748, -4))
        make_face()
        with BuildLine():
            Line((26.937742252, -4), (25.940664387, -4))
            ThreePointArc((25.940664387, -4), (29.311918719, -5.307488087), (30.9200231, -8.546142309))
            Line((30.9200231, -8.546142309), (30.505488036, -3.998199584))
            Line((30.505488036, -3.998199584), (26.937742252, -4))
        make_face()
        with BuildLine():
            ThreePointArc((30.9200231, 8.546142309), (29.311918719, 5.307488087), (25.940664387, 4))
            Line((25.940664387, 4), (26.937742252, 4))
            Line((26.937742252, 4), (30.505452056, 3.998181))
            Line((30.505452056, 3.998181), (30.869915211, 7.996399167))
            Line((30.869915211, 7.996399167), (30.9200231, 8.546142309))
        make_face()
    extrude(amount=FILLET2_DEPTH)


solid = part.part
